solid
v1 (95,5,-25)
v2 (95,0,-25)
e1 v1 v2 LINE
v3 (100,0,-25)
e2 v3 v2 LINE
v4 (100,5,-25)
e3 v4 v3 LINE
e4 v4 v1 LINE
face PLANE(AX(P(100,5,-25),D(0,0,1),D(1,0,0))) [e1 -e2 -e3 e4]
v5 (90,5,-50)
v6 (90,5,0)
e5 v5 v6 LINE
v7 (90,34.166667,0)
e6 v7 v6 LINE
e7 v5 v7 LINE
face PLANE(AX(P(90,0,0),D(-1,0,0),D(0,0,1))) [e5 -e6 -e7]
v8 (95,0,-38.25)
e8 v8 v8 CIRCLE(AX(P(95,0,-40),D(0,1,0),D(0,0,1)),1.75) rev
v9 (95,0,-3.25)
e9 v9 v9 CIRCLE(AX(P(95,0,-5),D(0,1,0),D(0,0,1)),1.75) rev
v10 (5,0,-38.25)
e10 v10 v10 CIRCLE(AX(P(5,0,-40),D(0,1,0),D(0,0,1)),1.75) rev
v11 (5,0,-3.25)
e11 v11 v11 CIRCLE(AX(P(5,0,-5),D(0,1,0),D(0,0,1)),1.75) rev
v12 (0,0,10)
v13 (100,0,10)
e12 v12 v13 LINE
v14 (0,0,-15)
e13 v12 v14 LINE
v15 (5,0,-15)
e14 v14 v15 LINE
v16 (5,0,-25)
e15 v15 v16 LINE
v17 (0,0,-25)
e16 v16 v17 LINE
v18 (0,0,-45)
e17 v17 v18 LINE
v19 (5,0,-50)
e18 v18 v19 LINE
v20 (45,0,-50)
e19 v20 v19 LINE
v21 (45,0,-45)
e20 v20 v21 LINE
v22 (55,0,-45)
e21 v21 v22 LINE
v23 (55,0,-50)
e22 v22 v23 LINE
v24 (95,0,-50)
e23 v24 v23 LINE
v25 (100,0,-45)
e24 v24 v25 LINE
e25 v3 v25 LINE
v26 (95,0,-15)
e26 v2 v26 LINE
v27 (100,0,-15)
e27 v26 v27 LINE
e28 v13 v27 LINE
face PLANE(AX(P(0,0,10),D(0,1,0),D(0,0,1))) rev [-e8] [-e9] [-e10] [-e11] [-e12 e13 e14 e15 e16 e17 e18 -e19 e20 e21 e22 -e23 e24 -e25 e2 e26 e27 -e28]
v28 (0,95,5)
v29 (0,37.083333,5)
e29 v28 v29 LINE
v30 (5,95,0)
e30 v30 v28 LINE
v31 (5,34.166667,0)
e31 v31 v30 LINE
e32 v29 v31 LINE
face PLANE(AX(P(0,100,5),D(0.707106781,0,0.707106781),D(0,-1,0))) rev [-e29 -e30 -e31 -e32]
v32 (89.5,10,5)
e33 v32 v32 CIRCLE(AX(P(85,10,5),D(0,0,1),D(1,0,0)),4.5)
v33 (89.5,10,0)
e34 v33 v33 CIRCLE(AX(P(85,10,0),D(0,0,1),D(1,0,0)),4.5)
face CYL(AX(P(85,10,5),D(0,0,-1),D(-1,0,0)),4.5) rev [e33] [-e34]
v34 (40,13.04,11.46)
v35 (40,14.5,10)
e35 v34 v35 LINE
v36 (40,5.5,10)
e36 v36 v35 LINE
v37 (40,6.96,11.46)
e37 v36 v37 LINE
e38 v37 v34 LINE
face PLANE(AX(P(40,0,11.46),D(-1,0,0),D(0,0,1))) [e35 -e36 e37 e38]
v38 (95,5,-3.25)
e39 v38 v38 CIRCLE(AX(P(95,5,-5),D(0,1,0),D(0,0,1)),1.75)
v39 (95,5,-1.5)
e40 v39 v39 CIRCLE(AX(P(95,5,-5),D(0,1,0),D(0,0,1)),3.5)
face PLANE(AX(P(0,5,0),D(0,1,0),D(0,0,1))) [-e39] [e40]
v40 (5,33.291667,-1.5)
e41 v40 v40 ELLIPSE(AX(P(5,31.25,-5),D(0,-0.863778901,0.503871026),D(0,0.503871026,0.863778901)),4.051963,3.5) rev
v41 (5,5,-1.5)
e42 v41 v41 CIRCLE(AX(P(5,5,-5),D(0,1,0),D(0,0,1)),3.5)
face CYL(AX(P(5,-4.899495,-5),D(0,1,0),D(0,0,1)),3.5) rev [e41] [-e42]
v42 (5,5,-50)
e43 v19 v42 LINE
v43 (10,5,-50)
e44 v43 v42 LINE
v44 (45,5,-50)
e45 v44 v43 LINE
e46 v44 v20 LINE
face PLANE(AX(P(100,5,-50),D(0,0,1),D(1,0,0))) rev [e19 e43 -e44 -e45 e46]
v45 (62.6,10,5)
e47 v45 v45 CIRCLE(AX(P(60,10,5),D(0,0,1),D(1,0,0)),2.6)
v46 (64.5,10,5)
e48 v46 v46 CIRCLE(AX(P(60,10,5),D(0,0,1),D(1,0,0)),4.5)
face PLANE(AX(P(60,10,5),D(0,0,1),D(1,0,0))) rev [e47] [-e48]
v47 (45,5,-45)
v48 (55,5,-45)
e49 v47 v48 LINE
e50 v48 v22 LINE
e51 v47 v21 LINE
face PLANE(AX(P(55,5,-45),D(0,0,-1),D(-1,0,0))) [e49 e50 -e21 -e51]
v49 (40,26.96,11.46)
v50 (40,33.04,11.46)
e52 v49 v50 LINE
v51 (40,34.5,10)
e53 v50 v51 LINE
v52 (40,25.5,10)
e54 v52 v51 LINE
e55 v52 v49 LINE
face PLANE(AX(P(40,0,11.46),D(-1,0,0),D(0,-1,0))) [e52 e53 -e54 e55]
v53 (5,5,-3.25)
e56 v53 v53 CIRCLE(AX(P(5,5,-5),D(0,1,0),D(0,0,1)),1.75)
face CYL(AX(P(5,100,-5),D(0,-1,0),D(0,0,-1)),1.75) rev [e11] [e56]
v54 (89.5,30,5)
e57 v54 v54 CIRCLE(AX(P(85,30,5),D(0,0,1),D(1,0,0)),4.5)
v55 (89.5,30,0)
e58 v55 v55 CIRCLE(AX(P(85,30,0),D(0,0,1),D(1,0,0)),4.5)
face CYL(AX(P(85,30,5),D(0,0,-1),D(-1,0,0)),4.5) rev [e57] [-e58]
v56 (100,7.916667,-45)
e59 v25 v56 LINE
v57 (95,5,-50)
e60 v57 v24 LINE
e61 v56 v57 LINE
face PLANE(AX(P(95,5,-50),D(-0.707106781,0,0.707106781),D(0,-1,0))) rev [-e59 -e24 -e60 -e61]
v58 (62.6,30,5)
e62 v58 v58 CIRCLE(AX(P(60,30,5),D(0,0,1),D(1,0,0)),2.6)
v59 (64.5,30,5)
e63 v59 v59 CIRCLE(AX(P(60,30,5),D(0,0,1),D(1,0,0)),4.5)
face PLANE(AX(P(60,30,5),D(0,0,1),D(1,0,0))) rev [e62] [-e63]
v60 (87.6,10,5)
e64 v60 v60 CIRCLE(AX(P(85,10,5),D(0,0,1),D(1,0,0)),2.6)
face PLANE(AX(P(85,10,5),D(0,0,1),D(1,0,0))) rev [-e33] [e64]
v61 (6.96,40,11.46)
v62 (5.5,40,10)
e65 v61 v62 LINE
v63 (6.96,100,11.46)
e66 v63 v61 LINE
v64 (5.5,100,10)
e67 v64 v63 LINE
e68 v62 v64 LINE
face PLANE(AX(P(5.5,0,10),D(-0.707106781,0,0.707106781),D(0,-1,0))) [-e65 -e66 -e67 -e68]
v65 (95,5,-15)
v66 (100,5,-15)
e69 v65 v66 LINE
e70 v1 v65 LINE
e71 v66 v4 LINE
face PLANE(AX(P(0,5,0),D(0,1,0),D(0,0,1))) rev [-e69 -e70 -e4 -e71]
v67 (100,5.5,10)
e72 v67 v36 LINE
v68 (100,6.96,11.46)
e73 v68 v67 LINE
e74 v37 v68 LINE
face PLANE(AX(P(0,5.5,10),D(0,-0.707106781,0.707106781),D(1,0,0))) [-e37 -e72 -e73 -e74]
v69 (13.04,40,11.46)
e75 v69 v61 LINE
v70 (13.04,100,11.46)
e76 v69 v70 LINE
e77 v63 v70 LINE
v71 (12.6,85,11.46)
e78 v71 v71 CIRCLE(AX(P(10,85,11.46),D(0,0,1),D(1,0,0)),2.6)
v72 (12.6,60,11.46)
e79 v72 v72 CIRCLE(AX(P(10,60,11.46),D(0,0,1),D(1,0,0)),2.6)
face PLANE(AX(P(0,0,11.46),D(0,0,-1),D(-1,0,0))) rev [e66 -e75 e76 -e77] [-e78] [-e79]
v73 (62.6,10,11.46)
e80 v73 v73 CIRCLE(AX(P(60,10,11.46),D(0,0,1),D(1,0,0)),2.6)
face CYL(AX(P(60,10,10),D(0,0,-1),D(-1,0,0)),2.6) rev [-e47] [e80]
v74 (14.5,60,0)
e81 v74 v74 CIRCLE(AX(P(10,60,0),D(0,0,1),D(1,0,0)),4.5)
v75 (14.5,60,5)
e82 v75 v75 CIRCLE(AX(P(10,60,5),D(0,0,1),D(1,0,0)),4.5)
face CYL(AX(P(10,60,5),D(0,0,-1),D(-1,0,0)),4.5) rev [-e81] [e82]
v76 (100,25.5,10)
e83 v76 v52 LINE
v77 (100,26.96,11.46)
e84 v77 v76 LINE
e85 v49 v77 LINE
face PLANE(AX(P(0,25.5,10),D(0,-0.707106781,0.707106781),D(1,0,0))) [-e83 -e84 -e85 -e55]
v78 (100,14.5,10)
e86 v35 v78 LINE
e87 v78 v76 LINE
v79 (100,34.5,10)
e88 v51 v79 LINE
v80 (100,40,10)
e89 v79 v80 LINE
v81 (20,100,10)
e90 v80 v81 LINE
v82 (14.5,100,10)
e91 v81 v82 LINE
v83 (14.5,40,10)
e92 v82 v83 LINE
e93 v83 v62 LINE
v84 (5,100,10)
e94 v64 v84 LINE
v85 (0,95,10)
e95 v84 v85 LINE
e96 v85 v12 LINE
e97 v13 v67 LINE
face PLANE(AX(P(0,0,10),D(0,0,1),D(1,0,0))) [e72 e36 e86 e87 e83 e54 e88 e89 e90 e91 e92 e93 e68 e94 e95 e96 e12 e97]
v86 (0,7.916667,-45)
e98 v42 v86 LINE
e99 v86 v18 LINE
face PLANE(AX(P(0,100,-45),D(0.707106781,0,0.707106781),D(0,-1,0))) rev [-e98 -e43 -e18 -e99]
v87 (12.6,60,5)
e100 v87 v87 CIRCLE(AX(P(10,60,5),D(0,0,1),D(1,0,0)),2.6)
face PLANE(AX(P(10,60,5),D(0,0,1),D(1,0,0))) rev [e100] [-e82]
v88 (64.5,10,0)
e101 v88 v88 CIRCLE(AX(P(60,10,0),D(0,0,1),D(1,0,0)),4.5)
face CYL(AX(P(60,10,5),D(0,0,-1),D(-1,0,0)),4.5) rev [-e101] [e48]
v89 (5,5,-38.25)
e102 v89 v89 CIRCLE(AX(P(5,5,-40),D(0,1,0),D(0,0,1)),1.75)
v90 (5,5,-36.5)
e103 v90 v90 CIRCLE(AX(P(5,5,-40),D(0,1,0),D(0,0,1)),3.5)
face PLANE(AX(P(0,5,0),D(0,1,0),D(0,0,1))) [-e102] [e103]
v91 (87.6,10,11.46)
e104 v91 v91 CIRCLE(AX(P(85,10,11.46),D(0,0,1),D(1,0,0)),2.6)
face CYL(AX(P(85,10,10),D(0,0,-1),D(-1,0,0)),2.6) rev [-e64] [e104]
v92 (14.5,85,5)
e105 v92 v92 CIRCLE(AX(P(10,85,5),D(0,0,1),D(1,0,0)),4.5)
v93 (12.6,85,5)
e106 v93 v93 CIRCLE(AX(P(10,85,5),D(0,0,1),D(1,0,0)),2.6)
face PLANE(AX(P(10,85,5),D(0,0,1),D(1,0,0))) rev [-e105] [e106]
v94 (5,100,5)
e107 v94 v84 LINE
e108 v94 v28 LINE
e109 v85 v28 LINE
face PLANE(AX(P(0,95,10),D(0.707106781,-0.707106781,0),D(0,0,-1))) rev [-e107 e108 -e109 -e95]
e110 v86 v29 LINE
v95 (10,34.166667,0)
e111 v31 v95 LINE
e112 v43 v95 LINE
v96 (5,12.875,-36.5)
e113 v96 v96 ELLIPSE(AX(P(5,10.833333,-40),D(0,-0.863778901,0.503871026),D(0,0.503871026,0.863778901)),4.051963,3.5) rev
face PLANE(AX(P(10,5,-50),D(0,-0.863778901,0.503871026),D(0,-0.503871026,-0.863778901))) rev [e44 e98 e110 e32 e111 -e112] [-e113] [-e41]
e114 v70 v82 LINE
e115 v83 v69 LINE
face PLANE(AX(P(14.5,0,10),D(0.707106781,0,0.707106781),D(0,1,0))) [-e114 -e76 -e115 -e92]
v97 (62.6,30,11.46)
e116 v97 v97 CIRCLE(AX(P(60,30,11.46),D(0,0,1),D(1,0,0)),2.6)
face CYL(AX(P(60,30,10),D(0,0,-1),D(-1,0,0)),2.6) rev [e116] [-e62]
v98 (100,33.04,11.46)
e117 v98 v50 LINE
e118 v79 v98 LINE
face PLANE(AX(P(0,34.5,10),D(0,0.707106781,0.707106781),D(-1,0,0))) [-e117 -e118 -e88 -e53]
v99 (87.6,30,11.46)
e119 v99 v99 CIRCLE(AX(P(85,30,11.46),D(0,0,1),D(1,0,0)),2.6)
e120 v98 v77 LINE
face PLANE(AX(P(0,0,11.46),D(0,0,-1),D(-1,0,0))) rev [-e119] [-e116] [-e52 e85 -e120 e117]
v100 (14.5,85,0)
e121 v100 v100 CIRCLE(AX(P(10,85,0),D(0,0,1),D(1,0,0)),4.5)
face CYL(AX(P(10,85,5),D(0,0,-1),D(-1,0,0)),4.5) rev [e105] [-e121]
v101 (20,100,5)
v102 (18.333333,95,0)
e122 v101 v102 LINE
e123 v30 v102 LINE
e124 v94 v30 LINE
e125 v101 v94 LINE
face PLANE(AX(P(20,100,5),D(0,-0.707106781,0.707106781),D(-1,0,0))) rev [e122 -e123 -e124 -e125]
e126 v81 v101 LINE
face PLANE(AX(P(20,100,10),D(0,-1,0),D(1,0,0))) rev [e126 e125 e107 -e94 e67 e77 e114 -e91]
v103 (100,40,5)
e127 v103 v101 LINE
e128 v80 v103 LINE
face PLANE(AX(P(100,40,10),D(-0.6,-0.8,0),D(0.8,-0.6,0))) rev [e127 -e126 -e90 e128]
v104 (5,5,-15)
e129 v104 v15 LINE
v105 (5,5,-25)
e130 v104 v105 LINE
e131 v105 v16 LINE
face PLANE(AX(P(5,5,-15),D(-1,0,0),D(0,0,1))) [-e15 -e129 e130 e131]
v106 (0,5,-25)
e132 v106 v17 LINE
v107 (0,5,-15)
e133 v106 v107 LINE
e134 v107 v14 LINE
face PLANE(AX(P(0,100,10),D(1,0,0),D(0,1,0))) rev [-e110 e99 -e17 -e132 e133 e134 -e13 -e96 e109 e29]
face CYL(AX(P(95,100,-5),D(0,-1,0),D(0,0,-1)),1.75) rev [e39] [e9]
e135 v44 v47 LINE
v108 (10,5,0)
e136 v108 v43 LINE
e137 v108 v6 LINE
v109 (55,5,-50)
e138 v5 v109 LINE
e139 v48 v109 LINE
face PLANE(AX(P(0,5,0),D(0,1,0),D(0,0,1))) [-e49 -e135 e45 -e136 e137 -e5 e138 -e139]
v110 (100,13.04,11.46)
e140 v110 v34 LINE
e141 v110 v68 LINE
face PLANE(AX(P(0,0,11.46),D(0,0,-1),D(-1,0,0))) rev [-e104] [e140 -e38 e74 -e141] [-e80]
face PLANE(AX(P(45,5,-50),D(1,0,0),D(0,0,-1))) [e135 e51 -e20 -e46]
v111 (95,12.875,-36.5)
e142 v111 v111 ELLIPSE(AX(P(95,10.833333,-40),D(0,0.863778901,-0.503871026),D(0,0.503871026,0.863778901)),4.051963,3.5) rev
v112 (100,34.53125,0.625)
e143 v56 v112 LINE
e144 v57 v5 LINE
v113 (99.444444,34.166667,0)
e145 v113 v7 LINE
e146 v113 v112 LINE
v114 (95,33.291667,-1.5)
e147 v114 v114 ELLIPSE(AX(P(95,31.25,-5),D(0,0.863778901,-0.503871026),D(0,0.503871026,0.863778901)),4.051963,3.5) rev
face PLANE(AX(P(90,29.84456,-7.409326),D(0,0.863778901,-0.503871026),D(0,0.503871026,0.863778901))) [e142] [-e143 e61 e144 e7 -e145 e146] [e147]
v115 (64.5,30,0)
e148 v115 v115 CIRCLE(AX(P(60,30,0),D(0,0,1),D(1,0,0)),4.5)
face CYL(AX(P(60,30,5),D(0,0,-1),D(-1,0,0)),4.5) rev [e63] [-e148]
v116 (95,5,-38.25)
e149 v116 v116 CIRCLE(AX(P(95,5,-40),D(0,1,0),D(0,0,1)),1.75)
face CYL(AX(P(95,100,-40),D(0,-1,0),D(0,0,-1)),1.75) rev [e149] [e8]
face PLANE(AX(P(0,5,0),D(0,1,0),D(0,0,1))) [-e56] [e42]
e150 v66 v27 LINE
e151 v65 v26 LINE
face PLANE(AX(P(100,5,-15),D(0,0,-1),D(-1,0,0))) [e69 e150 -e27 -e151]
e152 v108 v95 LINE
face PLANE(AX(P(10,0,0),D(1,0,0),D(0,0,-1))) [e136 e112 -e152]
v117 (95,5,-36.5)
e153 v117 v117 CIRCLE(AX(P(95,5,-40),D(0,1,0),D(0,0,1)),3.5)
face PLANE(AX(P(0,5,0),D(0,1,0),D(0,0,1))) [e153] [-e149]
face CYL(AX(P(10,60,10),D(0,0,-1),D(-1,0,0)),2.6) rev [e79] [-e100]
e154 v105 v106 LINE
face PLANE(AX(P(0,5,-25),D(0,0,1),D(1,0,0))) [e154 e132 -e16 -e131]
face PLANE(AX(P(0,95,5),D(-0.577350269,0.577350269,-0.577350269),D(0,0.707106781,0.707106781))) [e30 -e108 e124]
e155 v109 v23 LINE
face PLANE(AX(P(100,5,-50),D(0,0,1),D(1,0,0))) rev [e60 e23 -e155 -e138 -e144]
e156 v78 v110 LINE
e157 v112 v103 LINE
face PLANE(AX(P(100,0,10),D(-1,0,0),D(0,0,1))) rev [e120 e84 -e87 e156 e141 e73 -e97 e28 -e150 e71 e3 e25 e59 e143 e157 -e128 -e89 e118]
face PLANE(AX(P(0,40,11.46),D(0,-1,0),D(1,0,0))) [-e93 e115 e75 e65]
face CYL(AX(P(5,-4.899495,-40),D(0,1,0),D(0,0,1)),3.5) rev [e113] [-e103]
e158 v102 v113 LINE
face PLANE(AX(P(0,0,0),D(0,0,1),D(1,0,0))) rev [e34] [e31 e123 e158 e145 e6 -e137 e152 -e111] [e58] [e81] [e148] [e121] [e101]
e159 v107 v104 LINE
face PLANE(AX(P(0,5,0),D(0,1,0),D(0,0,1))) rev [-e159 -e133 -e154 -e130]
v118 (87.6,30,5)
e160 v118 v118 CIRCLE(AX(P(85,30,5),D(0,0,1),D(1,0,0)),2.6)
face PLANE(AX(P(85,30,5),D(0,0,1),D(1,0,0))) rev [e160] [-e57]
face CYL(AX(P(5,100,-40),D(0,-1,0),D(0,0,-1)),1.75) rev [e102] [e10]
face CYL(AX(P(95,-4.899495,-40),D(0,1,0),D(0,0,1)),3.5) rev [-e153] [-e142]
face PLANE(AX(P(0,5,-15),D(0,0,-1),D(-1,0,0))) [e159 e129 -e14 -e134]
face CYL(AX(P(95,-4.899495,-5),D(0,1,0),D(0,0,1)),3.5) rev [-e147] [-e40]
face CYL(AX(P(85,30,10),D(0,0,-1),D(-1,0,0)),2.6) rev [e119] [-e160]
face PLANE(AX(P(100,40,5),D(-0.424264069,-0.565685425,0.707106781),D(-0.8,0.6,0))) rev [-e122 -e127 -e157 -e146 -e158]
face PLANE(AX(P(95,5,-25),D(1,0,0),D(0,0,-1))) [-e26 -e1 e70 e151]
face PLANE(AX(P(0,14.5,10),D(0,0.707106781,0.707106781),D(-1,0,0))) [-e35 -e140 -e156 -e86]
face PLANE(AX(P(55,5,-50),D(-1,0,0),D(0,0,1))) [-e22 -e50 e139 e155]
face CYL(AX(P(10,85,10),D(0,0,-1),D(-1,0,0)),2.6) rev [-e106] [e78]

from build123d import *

# Parameters (mm, degrees)
BOSS_EXTRUDE1_DEPTH     = 10
SKETCH2_R               = 2.6
CUT_EXTRUDE1_DEPTH      = 142.774468788
BOSS_EXTRUDE3_START     = 10
SKETCH3_W               = 60
SKETCH3_H               = 9
SKETCH3_W_2             = 9
SKETCH3_H_2             = 60
BOSS_EXTRUDE3_DEPTH     = 1.46
CUT_EXTRUDE2_DEPTH      = 142.884923794
CUT_EXTRUDE2_DEPTH_BACK = 142.884923794
SKETCH2_2_R             = 2.6
CHAMFER1_SIZE           = 1.46
SKETCH4_R               = 4.5
CUT_EXTRUDE3_DEPTH      = 5
SKETCH5_W               = 100
SKETCH5_H               = 50
BOSS_EXTRUDE4_DEPTH     = 5
BOSS_EXTRUDE5_DEPTH     = 10
BOSS_EXTRUDE6_START     = 100
BOSS_EXTRUDE6_DEPTH     = 10
CUT_EXTRUDE4_DEPTH      = 151
CUT_EXTRUDE4_DEPTH_BACK = 151
SKETCH10_R              = 1.75
CUT_EXTRUDE5_START      = 100
SKETCH11_R              = 3.5
CUT_EXTRUDE5_DEPTH      = 95
SKETCH12_W              = 5
SKETCH12_H              = 10
SKETCH12_W_2            = 10
SKETCH12_H_2            = 5
CUT_EXTRUDE6_DEPTH      = 5
CHAMFER2_SIZE           = 5


# Some blends are built 0.0001 mm under size
with BuildPart() as part:
    # Sketch1 → Boss-Extrude1 (new body)
    with BuildSketch(Plane.XY):
        Polygon((0, 0), (100, 0), (100, 40), (20, 100), (0, 100), align=None)
    extrude(amount=BOSS_EXTRUDE1_DEPTH)

    # Sketch2 → Cut-Extrude1 (cut, through all)
    with BuildSketch(Plane.XY):
        with Locations((10, 85)):
            Circle(SKETCH2_R)
        with Locations((10, 60)):
            Circle(SKETCH2_R)
        with Locations((85, 30)):
            Circle(SKETCH2_R)
        with Locations((85, 10)):
            Circle(SKETCH2_R)
        with Locations((60, 10)):
            Circle(SKETCH2_R)
        with Locations((60, 30)):
            Circle(SKETCH2_R)
    extrude(amount=CUT_EXTRUDE1_DEPTH, mode=Mode.SUBTRACT)

    # Sketch3 → Boss-Extrude3 (add)
    with BuildSketch(Plane.XY.offset(BOSS_EXTRUDE3_START)):
        with Locations((70, 30)):
            Rectangle(SKETCH3_W, SKETCH3_H)
        with Locations((70, 10)):
            Rectangle(SKETCH3_W, SKETCH3_H)
        with Locations((10, 70)):
            Rectangle(SKETCH3_W_2, SKETCH3_H_2)
    extrude(amount=BOSS_EXTRUDE3_DEPTH)

    # Sketch2<2> → Cut-Extrude2 (cut, two sides: drawn at the far end of the back side and taken through both)
    with BuildSketch(Plane.XY.offset(-CUT_EXTRUDE2_DEPTH_BACK)):
        with Locations((10, 85)):
            Circle(SKETCH2_2_R)
        with Locations((10, 60)):
            Circle(SKETCH2_2_R)
        with Locations((85, 30)):
            Circle(SKETCH2_2_R)
        with Locations((85, 10)):
            Circle(SKETCH2_2_R)
        with Locations((60, 10)):
            Circle(SKETCH2_2_R)
        with Locations((60, 30)):
            Circle(SKETCH2_2_R)
    extrude(amount=CUT_EXTRUDE2_DEPTH + CUT_EXTRUDE2_DEPTH_BACK, mode=Mode.SUBTRACT)

    # Chamfer1
    chamfer1_edges = [part.edges().sort_by_distance(p)[0] for p in [
        (14.5, 70, 11.46),
        (5.5, 70, 11.46),
        (70, 5.5, 11.46),
        (70, 14.5, 11.46),
        (70, 25.5, 11.46),
        (70, 34.5, 11.46),
    ]]
    chamfer(chamfer1_edges, length=CHAMFER1_SIZE - 0.0001)  # a hair under: the kernel refuses the full size

    # Sketch4 → Cut-Extrude3 (cut)
    with BuildSketch(Plane.XY):
        with Locations((10, 85)):
            Circle(SKETCH4_R)
        with Locations((10, 60)):
            Circle(SKETCH4_R)
        with Locations((60, 30)):
            Circle(SKETCH4_R)
        with Locations((85, 30)):
            Circle(SKETCH4_R)
        with Locations((85, 10)):
            Circle(SKETCH4_R)
        with Locations((60, 10)):
            Circle(SKETCH4_R)
    extrude(amount=CUT_EXTRUDE3_DEPTH, mode=Mode.SUBTRACT)

    # Sketch5 → Boss-Extrude4 (add)
    with BuildSketch(Plane(origin=(0, 0, 0), x_dir=(1, 0, 0), z_dir=(0, 1, 0))):
        with Locations((50, 25)):
            Rectangle(SKETCH5_W, SKETCH5_H)
    extrude(amount=BOSS_EXTRUDE4_DEPTH)

    # Sketch8 → Boss-Extrude5 (add)
    with BuildSketch(Plane(origin=(0, 0, 0), x_dir=(0, 0, -1), z_dir=(1, 0, 0))):
        Polygon((-10, 5), (50, 5), (-10, 40), align=None)
    extrude(amount=BOSS_EXTRUDE5_DEPTH)

    # Sketch8<2> → Boss-Extrude6 (add)
    with BuildSketch(Plane(origin=(0, 0, 0), x_dir=(0, 0, -1), z_dir=(1, 0, 0)).offset(BOSS_EXTRUDE6_START)):
        Polygon((-10, 5), (50, 5), (-10, 40), align=None)
    extrude(amount=-BOSS_EXTRUDE6_DEPTH)

    # Sketch10 → Cut-Extrude4 (cut, two sides: drawn at the far end of the back side and taken through both)
    with BuildSketch(Plane(origin=(0, 0, 0), x_dir=(1, 0, 0), z_dir=(0, 1, 0)).offset(-CUT_EXTRUDE4_DEPTH_BACK)):
        with Locations(Location((5, 40, 0), (0, 0, 90))):
            Circle(SKETCH10_R)
        with Locations(Location((95, 40, 0), (0, 0, 90))):
            Circle(SKETCH10_R)
        with Locations(Location((95, 5, 0), (0, 0, 90))):
            Circle(SKETCH10_R)
        with Locations(Location((5, 5, 0), (0, 0, 90))):
            Circle(SKETCH10_R)
    extrude(amount=CUT_EXTRUDE4_DEPTH + CUT_EXTRUDE4_DEPTH_BACK, mode=Mode.SUBTRACT)

    # Sketch11 → Cut-Extrude5 (cut)
    with BuildSketch(Plane(origin=(0, 0, 0), x_dir=(1, 0, 0), z_dir=(0, 1, 0)).offset(CUT_EXTRUDE5_START)):
        with Locations(Location((5, 5, 0), (0, 0, 270))):
            Circle(SKETCH11_R)
        with Locations(Location((5, 40, 0), (0, 0, 270))):
            Circle(SKETCH11_R)
        with Locations(Location((95, 40, 0), (0, 0, 270))):
            Circle(SKETCH11_R)
        with Locations(Location((95, 5, 0), (0, 0, 270))):
            Circle(SKETCH11_R)
    extrude(amount=-CUT_EXTRUDE5_DEPTH, mode=Mode.SUBTRACT)

    # Sketch12 → Cut-Extrude6 (cut)
    with BuildSketch(Plane(origin=(0, 0, 0), x_dir=(1, 0, 0), z_dir=(0, 1, 0))):
        with Locations((97.5, 20)):
            Rectangle(SKETCH12_W, SKETCH12_H)
        with Locations((2.5, 20)):
            Rectangle(SKETCH12_W, SKETCH12_H)
        with Locations((50, 47.5)):
            Rectangle(SKETCH12_W_2, SKETCH12_H_2)
    extrude(amount=CUT_EXTRUDE6_DEPTH, mode=Mode.SUBTRACT)

    # Chamfer2
    # the kernel refuses this chamfer: 5 mm, written as the material it takes off along each edge
    with BuildSketch(Plane(origin=(3.333333333, 96.666666667, 3.333333333), x_dir=(0.7071067811865475, 0.7071067811865476, 0), z_dir=(-0.5773502691896258, 0.5773502691896258, -0.5773502691896258))) as chamfer2_piece_1:
        Polygon((-3.535533906, -2.041241452), (3.535533906, -2.041241452), (0, 4.082482905), align=None)
    extrude(amount=6.350852961, mode=Mode.SUBTRACT)
    with BuildSketch(Plane(origin=(100, -12.85841494, -50), x_dir=(0.0274958766105877, 0, 0.9996219169112968), z_dir=(0, 1, 0))) as chamfer2_piece_2:
        Polygon((CHAMFER2_SIZE * 0.999621916911, -CHAMFER2_SIZE * 0.0274958766106), (-CHAMFER2_SIZE * 0.0274958766106, -CHAMFER2_SIZE * 0.999621916911), (0, 0), align=None)
    extrude(amount=30.71682988, mode=Mode.SUBTRACT)
    with BuildSketch(Plane(origin=(0, -12.85841494, -50), x_dir=(-0.027495876610586372, 0, 0.9996219169112968), z_dir=(0, 1, 0))) as chamfer2_piece_3:
        Polygon((CHAMFER2_SIZE * 0.999621916911, CHAMFER2_SIZE * 0.0274958766106), (-CHAMFER2_SIZE * 0.0274958766106, CHAMFER2_SIZE * 0.999621916911), (0, 0), align=None)
    extrude(amount=30.71682988, mode=Mode.SUBTRACT)
    with BuildSketch(Plane(origin=(0, 100, -12.85841494), x_dir=(0.9996219169112968, 0.0274958766105877, 0), z_dir=(0, 0, 1))) as chamfer2_piece_4:
        Polygon((CHAMFER2_SIZE * 0.999621916911, -CHAMFER2_SIZE * 0.0274958766106), (-CHAMFER2_SIZE * 0.0274958766106, -CHAMFER2_SIZE * 0.999621916911), (0, 0), align=None)
    extrude(amount=35.71682988, mode=Mode.SUBTRACT)
    with BuildSketch(Plane(origin=(110.286731952, 32.284951036, 0), x_dir=(0.016497525966350957, 0.021996701288467948, 0.9996219169112968), z_dir=(-0.8000000000000002, 0.6, 0))) as chamfer2_piece_5_section:
        Polygon((CHAMFER2_SIZE * 0.999621916911, -CHAMFER2_SIZE * 0.0274958766106), (-CHAMFER2_SIZE * 0.0274958766106, -CHAMFER2_SIZE * 0.999621916911), (0, 0), align=None)
    chamfer2_piece_5 = extrude(amount=125.71682988, mode=Mode.PRIVATE)
    chamfer2_piece_5 = split(chamfer2_piece_5, bisect_by=Plane(origin=(58.587038142, 43.71482671, 16.368274359), z_dir=(0, 0.8637789008984335, -0.5038710255240861)), keep=Keep.TOP, mode=Mode.PRIVATE)
    add(chamfer2_piece_5, mode=Mode.SUBTRACT)
    with BuildSketch(Plane(origin=(32.85841494, 100, 0), x_dir=(0, 0.0274958766105877, 0.9996219169112968), z_dir=(-1, 0, 0))) as chamfer2_piece_6:
        Polygon((CHAMFER2_SIZE * 0.999621916911, -CHAMFER2_SIZE * 0.0274958766106), (-CHAMFER2_SIZE * 0.0274958766106, -CHAMFER2_SIZE * 0.999621916911), (0, 0), align=None)
    extrude(amount=45.71682988, mode=Mode.SUBTRACT)
    with BuildSketch(Plane(origin=(0, 112.85841494, 0), x_dir=(-0.02749587661058638, 0, 0.9996219169112968), z_dir=(0, -1, 0))) as chamfer2_piece_7_section:
        Polygon((CHAMFER2_SIZE * 0.999621916911, -CHAMFER2_SIZE * 0.0274958766106), (-CHAMFER2_SIZE * 0.0274958766106, -CHAMFER2_SIZE * 0.999621916911), (0, 0), align=None)
    chamfer2_piece_7 = extrude(amount=91.550163213, mode=Mode.PRIVATE)
    chamfer2_piece_7 = split(chamfer2_piece_7, bisect_by=Plane(origin=(1.672912206, 43.366191756, 15.770614439), z_dir=(0, 0.8637789008984335, -0.5038710255240861)), keep=Keep.TOP, mode=Mode.PRIVATE)
    add(chamfer2_piece_7, mode=Mode.SUBTRACT)


solid = part.part
